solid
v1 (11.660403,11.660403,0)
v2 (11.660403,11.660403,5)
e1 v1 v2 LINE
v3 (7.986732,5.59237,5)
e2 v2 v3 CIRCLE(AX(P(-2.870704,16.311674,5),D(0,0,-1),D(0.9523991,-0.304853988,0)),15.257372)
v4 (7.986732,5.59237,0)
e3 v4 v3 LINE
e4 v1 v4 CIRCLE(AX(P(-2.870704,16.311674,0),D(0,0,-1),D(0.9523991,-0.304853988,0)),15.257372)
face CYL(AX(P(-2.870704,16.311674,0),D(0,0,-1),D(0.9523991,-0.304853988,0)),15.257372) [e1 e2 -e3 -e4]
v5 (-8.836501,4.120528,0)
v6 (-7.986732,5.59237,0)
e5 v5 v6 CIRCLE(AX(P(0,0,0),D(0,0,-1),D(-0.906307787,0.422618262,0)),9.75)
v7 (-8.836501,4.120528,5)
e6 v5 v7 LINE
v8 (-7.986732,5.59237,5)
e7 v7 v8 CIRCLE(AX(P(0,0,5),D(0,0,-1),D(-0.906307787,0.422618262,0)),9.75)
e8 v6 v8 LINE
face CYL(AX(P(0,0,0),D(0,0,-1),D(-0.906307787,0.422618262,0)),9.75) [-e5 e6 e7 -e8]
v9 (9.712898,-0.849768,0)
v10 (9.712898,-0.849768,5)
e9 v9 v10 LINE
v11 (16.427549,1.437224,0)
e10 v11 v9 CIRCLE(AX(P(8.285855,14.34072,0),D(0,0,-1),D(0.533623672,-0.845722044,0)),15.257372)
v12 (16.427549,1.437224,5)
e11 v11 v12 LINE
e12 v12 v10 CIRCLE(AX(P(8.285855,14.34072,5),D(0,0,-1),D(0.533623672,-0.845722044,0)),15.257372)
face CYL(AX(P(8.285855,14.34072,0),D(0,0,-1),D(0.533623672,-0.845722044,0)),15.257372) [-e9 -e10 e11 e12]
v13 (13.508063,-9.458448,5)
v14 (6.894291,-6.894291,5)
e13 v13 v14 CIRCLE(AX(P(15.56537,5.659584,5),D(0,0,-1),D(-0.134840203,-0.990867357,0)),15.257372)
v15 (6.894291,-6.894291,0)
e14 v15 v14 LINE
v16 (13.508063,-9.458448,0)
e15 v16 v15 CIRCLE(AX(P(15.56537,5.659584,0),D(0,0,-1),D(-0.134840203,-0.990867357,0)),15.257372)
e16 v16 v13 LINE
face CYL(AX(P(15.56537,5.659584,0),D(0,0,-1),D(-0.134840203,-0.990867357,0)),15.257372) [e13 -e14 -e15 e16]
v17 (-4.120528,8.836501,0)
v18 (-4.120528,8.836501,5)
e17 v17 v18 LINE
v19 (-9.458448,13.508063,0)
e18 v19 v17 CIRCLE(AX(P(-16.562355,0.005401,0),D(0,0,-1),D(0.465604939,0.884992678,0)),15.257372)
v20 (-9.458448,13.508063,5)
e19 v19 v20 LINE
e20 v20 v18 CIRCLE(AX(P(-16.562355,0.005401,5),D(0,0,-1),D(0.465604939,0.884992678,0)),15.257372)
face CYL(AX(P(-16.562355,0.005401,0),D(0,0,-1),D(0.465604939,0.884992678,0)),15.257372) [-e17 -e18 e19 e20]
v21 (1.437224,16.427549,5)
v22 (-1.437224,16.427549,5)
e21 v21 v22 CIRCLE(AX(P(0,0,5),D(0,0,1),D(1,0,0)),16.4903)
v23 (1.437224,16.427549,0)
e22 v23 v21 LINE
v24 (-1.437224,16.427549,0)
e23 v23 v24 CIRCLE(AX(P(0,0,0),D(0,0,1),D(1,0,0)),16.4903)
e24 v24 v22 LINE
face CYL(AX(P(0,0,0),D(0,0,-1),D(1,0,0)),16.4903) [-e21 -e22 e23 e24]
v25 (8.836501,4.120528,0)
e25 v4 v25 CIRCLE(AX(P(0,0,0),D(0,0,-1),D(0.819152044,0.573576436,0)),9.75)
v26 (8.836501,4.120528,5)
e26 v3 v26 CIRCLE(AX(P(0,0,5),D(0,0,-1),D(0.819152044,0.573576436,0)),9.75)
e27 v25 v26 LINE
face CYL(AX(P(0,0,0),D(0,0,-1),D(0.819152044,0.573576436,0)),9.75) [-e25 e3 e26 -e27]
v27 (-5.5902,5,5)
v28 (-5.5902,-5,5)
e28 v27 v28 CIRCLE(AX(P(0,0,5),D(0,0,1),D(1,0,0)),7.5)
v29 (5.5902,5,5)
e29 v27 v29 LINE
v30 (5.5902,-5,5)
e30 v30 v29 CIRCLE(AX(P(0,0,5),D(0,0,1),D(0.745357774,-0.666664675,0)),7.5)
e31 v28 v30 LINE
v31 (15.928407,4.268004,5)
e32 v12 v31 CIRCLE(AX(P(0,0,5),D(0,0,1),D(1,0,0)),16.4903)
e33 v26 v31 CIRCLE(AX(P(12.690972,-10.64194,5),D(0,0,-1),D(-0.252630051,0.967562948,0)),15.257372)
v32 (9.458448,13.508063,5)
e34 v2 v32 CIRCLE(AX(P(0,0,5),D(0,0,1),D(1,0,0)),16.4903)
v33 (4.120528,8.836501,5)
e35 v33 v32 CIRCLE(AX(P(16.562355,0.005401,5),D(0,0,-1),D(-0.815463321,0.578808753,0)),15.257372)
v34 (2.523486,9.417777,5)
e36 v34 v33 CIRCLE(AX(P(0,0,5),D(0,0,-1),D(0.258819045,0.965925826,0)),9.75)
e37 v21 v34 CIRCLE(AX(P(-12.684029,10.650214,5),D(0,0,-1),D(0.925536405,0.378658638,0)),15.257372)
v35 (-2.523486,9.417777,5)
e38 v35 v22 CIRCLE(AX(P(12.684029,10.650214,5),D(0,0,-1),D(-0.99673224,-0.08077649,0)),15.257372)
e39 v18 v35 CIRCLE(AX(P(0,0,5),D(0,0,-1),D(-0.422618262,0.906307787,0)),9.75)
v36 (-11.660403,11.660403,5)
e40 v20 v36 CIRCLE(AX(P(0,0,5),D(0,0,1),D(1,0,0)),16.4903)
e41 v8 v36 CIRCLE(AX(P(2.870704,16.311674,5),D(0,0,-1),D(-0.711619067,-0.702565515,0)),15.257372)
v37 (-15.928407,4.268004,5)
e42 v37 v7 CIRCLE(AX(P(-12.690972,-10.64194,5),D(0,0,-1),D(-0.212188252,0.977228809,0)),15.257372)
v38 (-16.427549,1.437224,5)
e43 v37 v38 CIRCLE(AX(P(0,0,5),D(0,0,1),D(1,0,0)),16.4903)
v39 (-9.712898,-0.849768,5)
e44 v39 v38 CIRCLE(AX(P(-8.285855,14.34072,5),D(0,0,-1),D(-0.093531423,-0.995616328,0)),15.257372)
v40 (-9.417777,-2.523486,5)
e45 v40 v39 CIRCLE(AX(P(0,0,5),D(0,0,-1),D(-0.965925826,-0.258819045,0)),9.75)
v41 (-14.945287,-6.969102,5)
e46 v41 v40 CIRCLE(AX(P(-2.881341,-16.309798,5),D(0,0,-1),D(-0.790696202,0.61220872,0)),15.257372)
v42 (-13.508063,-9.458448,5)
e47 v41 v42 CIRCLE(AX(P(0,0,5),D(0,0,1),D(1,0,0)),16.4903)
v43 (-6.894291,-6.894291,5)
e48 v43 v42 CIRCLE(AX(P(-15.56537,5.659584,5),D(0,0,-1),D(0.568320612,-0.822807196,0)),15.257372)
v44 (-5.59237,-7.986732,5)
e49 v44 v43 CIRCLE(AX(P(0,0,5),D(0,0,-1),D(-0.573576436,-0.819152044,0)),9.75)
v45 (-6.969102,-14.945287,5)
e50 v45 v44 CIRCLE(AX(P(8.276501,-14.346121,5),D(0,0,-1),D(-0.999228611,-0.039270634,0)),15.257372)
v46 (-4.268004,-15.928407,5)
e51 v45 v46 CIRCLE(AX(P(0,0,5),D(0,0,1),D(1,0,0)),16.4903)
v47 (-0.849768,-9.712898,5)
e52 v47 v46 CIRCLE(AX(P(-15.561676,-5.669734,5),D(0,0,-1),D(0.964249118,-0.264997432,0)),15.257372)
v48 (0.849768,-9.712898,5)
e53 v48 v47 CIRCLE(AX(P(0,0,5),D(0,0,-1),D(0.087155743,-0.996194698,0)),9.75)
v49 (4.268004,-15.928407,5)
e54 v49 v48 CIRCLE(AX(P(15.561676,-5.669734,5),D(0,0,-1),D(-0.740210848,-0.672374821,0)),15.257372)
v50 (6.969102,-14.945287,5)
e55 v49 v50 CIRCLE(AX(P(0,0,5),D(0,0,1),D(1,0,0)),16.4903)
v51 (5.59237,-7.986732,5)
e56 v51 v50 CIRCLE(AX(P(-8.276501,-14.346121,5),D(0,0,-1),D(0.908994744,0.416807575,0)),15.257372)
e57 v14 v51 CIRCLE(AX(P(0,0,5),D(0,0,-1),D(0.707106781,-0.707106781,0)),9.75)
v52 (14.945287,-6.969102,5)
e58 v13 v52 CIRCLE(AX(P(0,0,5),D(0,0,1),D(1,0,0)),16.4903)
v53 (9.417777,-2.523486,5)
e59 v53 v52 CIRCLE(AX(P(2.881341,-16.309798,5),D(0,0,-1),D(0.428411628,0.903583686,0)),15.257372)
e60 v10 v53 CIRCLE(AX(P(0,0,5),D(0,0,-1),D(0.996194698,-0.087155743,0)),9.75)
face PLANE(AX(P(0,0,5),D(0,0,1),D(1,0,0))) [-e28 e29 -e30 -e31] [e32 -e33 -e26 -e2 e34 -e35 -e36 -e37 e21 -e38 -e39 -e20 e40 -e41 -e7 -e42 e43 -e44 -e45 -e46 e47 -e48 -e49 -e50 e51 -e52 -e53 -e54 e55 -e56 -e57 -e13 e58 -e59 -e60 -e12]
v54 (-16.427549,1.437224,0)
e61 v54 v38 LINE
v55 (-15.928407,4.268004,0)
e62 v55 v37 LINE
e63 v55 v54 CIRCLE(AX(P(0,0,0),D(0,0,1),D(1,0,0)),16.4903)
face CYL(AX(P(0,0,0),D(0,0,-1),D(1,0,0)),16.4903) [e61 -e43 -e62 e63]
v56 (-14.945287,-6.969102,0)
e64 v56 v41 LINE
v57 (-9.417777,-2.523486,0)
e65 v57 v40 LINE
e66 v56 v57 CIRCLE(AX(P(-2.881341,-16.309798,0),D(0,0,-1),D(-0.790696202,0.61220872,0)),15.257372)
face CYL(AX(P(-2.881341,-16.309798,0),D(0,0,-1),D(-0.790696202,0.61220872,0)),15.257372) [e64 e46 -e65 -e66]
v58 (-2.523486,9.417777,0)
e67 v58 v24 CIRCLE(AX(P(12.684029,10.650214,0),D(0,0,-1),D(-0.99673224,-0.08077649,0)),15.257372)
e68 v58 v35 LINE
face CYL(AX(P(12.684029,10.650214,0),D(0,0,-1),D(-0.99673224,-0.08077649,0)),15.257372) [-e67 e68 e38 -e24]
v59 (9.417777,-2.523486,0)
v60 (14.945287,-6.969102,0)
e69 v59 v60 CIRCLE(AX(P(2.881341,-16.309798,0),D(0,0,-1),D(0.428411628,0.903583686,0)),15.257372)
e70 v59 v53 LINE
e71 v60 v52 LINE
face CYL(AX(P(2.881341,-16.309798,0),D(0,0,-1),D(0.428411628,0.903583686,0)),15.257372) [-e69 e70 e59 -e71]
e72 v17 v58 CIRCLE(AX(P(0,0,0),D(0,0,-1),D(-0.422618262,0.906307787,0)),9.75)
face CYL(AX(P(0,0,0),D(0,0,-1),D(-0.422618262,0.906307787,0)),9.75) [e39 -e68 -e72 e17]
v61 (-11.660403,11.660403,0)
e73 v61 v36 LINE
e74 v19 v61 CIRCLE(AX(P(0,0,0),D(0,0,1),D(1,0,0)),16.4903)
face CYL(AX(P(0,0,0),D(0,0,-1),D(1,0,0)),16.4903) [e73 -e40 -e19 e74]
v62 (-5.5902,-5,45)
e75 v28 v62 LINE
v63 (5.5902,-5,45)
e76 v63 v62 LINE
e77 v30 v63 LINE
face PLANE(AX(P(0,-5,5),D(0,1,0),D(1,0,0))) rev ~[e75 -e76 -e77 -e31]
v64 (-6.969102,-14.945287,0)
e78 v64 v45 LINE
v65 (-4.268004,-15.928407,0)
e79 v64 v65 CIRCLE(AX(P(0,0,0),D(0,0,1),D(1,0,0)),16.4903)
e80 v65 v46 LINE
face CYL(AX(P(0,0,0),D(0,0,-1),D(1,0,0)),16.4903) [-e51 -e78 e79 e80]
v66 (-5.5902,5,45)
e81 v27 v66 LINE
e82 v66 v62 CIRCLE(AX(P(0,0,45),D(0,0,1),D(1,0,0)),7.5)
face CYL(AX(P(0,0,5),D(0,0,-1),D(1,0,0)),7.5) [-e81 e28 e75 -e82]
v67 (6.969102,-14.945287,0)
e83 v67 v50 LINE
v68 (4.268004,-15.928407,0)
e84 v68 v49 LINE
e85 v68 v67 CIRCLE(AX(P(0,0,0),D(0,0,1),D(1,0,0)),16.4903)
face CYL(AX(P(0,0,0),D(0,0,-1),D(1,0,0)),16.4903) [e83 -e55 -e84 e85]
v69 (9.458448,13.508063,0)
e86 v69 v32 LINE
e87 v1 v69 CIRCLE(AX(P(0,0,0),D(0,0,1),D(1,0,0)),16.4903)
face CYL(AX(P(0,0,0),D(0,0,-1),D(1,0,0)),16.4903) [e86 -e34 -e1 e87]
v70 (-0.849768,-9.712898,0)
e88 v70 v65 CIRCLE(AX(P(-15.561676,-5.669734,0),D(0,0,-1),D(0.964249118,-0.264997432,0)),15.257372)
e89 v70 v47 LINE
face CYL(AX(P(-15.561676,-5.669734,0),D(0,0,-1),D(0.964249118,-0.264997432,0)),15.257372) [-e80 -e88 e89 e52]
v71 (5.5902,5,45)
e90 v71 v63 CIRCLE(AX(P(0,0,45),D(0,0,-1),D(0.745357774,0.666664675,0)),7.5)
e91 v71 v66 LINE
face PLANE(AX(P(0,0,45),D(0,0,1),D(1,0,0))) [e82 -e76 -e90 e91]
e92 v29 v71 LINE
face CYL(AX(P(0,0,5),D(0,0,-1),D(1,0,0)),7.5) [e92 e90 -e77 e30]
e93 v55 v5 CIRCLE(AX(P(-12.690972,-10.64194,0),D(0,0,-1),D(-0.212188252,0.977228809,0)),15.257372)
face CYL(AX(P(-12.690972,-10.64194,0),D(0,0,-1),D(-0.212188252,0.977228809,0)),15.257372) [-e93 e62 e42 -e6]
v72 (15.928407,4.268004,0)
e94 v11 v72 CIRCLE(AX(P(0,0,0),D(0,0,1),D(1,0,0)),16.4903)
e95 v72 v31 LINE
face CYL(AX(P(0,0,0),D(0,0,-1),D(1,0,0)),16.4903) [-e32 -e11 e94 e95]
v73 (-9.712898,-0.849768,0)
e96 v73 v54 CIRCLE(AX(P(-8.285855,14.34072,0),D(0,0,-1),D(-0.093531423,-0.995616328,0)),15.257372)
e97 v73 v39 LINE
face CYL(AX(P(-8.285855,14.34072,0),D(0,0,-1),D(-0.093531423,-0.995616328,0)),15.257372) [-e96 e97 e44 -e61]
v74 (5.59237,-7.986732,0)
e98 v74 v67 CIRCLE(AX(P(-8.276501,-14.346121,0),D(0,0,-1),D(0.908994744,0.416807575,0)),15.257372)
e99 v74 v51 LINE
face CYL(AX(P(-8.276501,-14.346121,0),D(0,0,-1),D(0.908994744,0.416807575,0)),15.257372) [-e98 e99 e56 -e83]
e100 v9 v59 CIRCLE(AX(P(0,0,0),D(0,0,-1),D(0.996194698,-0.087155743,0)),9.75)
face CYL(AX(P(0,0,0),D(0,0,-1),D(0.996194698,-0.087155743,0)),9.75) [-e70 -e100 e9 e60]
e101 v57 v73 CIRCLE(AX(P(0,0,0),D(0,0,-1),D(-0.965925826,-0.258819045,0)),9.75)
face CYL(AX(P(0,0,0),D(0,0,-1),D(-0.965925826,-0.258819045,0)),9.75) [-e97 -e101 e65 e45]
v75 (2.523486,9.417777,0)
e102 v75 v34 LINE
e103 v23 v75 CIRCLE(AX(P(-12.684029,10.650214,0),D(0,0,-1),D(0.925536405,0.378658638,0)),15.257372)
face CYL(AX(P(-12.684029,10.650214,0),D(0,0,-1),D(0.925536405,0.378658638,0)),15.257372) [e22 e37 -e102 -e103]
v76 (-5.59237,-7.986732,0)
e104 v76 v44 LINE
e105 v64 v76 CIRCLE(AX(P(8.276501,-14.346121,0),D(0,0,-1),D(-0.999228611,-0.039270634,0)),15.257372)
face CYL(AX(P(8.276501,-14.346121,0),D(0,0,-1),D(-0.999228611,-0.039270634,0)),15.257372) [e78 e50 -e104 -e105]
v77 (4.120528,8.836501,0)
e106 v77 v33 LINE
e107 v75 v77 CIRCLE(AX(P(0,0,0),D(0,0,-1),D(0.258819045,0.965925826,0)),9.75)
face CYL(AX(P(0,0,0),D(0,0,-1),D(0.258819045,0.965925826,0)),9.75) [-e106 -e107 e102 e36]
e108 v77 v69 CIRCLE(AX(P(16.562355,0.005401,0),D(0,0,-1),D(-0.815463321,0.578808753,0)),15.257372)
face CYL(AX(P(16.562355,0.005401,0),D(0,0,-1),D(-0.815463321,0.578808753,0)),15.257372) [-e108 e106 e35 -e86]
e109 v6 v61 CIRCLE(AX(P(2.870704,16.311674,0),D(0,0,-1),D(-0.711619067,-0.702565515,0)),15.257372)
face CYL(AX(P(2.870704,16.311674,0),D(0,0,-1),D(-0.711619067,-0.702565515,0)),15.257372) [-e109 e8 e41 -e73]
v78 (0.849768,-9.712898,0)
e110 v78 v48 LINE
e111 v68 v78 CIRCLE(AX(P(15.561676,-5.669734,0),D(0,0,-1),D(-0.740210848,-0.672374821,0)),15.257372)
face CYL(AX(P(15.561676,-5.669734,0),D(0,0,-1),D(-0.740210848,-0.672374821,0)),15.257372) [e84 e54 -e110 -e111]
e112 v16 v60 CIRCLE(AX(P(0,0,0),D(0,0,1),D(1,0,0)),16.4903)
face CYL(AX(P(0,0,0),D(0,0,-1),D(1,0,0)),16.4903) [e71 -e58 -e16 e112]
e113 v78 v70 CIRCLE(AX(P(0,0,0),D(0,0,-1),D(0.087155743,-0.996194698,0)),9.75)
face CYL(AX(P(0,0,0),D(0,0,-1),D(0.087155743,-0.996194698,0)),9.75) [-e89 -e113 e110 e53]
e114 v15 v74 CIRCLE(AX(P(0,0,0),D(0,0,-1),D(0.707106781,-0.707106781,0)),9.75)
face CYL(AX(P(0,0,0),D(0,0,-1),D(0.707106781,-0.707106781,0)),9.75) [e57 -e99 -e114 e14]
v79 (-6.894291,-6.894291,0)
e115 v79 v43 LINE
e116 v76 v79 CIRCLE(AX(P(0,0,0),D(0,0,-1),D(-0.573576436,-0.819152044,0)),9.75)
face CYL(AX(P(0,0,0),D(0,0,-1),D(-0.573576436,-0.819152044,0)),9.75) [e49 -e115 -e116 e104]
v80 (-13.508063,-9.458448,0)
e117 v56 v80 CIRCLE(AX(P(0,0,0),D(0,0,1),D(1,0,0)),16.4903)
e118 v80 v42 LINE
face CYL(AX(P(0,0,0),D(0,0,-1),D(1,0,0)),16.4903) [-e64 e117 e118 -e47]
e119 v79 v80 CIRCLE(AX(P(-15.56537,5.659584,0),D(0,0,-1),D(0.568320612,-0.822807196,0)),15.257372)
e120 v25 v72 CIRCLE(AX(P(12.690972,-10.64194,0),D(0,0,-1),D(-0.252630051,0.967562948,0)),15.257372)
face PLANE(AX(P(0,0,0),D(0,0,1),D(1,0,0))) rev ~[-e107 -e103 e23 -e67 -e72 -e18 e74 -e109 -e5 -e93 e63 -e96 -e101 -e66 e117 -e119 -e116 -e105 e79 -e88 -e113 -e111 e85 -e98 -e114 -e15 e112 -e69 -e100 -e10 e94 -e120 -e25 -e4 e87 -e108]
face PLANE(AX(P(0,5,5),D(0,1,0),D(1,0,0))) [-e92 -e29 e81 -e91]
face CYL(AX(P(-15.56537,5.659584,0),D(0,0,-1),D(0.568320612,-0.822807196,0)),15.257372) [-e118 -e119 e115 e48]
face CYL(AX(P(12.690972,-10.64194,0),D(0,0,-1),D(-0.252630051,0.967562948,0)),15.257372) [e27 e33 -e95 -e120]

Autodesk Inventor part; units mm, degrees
sketch "Sketch1" plane through (0, 0, 0) normal (0, 0, 1) x (1, 0, 0)
  circle A0 centre (0, 0) radius 16.4903
  dimension "d0" = 32.9806
extrude "Extrusion1" add sketch "Sketch1" along normal blind 5
ref_plane "Work Plane2" through (0, 0, 2.5) normal (0, 0, 1) x (1, 0, 0)
sketch "Sketch2" plane through (0, 0, 0) normal (0, 0, -1) x (-1, 0, 0)
  circle A0 centre (0, 0) radius 16.4903 projected
  circle A1 centre (0, 0) radius 13.5855
  dimension "d3" = 27.171
surface extrude "Pitch Diameter" sketch "Sketch2" against normal through all shown no curves A1
ref_plane "Work Plane8" through (0, 0, 0) normal (0.9396926, 0.3420201, 0) x (0, 0, 1)
ref_plane "Work Plane9" through (0, 0, 0) normal (1, 0, 0) x (0, 1, 0)
spur gear teeth "Spur Gear" teeth 9 pitch diameter 27 tip diameter 32.9806 root diameter 19.5 face width 5 start plane through (0, 0, 0) normal (0, 0, -1) x (-1, 0, 0)
sketch "Sketch3" plane through (0, 0, 5) normal (0, 0, 1) x (1, 0, 0)
  circle A0 centre (0, 0) radius 7.5
  line L0 (0, 0) -> (0, 5)
  line L1 (0, 5) -> (-5.5902, 5)
  line L2 (0, 5) -> (5.5902, 5)
  line L3 (0, 0) -> (0, -5)
  line L4 (0, -5) -> (5.5902, -5)
  line L5 (0, -5) -> (-5.5902, -5)
  dimension "d49" = 15
  dimension "d50" = 5
  dimension "d51" = 5
extrude "Extrusion2" add sketch "Sketch3" along normal blind 40 contours A0 L4 L3 L0 L2 | L1 L0 L3 L5 A0
equation "\"d0\" = da_da"
equation "\"d1\" = da_b"
equation "\"d3\" = da_dw"
equation "\"d16\" = da_aw"
equation "\"d43\" = da_aw"
equation "\"d46\" = da_aw"
equation "\"da_da\" = 32.980581"
equation "\"da_b\" = 5"
equation "\"da_dw\" = 27.170952"
equation "\"da_aw\" = 164.535212"
properties part number "Spur Gear1" material "Steel"
